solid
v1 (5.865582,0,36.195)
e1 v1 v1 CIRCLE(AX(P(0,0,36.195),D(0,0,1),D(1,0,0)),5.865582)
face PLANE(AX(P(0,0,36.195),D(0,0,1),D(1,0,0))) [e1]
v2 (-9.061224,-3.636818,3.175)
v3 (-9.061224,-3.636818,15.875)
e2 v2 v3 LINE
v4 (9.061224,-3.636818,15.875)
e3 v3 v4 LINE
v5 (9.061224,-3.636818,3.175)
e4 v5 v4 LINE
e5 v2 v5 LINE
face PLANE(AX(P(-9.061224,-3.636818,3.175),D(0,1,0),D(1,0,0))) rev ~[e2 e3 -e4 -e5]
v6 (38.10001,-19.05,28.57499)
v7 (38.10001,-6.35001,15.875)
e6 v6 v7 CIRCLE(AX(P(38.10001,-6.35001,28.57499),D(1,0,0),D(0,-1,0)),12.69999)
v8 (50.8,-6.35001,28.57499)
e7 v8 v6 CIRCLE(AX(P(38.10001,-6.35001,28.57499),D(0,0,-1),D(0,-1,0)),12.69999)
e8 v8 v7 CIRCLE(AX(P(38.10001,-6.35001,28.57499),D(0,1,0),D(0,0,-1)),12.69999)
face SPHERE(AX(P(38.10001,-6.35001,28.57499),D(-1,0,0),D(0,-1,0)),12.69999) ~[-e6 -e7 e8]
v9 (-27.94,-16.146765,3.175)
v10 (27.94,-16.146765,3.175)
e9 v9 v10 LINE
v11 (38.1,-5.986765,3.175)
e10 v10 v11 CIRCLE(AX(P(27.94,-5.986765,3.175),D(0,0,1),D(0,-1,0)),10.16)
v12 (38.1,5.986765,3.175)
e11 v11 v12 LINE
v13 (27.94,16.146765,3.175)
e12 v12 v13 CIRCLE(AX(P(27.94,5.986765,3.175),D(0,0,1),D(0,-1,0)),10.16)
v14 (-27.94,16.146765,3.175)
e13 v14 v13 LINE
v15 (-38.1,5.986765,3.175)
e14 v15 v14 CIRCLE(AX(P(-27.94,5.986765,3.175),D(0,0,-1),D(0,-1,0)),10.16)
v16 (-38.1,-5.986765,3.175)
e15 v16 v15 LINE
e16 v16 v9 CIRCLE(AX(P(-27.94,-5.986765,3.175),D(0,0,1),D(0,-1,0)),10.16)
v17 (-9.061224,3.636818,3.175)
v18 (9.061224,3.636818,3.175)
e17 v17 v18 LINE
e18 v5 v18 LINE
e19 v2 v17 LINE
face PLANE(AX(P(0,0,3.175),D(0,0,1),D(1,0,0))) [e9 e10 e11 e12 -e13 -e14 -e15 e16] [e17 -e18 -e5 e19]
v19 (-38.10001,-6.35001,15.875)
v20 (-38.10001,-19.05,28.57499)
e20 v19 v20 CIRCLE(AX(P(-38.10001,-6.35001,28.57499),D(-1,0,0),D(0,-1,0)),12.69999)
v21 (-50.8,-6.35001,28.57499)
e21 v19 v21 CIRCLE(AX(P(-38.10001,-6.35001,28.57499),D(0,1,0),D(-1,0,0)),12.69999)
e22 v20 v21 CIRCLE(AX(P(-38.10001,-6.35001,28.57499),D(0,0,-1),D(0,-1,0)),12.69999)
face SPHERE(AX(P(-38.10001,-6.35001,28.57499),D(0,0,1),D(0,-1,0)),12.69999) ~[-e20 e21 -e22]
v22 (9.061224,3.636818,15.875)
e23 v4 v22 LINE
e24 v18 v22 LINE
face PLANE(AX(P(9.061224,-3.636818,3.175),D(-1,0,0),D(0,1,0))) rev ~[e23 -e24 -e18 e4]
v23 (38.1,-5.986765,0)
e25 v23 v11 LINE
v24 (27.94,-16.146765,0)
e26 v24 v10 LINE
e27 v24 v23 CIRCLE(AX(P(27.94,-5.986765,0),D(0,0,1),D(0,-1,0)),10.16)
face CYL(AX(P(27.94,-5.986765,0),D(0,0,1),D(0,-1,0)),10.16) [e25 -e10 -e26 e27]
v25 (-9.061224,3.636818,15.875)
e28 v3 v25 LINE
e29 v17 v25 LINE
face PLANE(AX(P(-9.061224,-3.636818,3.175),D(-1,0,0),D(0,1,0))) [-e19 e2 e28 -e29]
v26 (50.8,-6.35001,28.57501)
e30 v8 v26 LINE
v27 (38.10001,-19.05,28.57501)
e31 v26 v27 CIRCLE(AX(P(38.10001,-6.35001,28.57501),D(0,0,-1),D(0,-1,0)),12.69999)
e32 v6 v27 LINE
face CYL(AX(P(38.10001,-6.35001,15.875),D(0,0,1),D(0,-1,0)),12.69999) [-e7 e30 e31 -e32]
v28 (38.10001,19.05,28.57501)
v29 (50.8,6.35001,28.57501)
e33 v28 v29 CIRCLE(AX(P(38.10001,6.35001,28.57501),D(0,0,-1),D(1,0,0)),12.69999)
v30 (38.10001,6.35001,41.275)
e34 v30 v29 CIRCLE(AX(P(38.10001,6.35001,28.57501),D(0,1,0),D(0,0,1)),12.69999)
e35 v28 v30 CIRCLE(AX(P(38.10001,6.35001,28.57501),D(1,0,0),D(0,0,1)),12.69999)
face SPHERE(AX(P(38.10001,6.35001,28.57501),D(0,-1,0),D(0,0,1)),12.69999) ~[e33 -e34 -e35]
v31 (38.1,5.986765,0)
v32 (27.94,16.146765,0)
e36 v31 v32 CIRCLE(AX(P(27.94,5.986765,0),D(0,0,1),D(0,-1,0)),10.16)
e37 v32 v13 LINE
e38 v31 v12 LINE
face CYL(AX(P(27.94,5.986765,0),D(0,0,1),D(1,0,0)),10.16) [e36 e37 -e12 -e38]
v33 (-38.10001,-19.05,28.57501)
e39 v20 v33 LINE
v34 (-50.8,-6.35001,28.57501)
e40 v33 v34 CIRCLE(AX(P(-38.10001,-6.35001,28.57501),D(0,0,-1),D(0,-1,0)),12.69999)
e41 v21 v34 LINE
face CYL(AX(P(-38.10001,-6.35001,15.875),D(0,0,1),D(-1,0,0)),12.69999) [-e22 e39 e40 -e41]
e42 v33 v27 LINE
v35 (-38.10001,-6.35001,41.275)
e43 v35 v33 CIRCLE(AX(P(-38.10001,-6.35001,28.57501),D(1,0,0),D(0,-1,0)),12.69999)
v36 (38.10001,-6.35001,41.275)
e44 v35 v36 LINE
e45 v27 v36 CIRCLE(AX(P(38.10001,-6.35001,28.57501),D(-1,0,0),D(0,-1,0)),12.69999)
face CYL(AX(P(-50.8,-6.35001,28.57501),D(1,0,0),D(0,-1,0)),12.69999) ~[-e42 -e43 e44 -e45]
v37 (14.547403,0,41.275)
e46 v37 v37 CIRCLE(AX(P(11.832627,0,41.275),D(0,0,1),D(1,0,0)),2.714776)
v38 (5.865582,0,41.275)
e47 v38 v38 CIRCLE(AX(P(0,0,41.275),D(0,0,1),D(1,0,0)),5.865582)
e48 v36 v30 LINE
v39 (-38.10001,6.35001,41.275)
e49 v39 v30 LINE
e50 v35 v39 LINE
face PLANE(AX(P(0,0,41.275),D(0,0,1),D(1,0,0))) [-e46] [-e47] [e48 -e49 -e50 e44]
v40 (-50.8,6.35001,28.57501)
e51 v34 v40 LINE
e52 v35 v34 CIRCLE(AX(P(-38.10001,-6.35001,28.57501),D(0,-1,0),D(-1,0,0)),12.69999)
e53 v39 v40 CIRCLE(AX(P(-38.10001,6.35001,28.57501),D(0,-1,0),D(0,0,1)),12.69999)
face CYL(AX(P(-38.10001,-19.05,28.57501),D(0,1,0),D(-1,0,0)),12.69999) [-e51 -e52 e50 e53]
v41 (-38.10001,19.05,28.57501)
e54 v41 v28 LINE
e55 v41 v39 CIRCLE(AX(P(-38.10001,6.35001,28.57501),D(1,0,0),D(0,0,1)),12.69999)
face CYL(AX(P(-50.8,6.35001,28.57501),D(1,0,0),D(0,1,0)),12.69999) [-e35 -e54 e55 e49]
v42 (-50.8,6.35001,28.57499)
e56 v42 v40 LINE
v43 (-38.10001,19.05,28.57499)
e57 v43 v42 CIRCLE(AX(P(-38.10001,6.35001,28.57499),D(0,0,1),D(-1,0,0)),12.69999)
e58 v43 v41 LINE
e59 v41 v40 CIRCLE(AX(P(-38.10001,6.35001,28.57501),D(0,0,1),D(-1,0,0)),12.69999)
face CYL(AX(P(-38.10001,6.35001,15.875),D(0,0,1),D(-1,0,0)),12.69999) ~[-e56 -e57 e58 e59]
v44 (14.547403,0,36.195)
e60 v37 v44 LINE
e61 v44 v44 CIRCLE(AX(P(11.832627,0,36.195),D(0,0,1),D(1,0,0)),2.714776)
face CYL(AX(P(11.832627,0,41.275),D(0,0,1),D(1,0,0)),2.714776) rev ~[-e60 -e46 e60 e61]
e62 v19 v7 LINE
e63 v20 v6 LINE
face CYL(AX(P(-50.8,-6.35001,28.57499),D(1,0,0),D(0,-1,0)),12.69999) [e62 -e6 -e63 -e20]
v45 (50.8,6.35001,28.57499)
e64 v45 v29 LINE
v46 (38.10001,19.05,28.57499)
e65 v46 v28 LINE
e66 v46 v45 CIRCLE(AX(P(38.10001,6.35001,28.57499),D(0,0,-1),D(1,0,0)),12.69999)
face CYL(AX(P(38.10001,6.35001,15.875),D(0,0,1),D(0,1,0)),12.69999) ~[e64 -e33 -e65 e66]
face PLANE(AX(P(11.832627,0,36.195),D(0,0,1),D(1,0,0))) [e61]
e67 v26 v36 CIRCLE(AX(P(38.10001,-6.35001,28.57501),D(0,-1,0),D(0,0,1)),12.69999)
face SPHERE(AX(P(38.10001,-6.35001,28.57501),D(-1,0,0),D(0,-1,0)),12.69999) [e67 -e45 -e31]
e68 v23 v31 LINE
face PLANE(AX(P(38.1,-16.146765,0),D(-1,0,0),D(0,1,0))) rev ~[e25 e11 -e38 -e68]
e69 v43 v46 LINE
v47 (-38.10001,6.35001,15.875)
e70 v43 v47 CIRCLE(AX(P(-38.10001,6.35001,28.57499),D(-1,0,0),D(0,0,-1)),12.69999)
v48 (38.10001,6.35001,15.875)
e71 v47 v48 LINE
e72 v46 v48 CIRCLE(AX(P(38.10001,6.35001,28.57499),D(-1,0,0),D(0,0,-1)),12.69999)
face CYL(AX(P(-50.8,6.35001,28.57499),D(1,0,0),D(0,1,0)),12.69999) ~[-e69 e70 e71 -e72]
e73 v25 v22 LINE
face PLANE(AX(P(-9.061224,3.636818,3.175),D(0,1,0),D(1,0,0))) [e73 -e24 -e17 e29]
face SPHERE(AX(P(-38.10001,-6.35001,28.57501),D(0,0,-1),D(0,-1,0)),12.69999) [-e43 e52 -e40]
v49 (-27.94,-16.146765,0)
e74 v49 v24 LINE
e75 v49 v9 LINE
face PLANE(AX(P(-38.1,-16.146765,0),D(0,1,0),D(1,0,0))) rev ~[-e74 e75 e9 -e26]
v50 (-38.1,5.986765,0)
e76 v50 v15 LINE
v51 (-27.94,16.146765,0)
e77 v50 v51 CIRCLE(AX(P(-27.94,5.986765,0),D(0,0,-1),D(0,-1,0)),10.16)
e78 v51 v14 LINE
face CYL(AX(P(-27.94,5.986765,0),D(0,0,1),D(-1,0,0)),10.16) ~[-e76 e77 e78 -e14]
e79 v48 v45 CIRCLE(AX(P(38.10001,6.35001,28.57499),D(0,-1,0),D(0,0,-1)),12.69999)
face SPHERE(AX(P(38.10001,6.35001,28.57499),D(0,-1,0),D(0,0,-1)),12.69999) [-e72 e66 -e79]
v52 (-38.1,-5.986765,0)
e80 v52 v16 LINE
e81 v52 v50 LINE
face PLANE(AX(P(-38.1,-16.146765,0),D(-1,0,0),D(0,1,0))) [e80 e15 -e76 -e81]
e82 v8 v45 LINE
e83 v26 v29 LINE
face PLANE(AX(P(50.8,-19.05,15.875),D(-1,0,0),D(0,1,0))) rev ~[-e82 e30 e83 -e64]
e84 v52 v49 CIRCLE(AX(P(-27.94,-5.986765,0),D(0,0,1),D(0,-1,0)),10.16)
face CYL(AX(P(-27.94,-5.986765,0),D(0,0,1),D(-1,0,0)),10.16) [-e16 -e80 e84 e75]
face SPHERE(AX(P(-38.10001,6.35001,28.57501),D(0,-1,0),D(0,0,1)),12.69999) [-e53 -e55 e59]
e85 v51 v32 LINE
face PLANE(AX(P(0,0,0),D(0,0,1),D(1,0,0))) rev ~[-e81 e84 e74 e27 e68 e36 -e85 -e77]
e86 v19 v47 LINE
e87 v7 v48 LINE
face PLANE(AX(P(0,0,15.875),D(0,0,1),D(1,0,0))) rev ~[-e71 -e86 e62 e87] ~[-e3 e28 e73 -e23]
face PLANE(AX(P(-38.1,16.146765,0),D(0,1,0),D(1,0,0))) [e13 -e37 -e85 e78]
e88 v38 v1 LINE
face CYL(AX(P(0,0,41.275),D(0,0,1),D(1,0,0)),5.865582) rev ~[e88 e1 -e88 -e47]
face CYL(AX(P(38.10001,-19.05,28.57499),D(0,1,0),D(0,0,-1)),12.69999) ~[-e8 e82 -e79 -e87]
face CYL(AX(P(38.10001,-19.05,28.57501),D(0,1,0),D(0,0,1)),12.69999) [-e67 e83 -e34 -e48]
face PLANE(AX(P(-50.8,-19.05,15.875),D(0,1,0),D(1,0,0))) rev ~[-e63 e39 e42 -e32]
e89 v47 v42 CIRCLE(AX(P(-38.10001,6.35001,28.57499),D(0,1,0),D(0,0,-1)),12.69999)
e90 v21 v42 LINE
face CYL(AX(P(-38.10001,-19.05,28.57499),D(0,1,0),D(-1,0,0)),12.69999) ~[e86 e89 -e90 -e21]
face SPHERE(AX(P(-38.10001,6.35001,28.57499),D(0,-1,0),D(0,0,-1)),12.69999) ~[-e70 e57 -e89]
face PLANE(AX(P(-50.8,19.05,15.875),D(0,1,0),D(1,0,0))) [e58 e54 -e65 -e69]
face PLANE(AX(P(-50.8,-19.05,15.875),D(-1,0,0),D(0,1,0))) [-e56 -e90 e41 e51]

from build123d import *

# Parameters (mm, degrees)
F0_W     = 76.2
F0_H     = 32.2935292425
F1_DEPTH = 3.175
F2_R     = 10.16
F3_W     = 18.1224476546
F3_H     = 7.2736367583
F4_DEPTH = 12.7
F5_W     = 101.6
F5_H     = 38.1
F5_W_2   = 18.1224476546
F5_H_2   = 7.2736367583
F6_DEPTH = 25.4
F7_R     = 12.69999
F8_R     = 5.8655823146
F8_R_2   = 2.7147756384
F9_DEPTH = 5.08


# Not quite as in the source:
# - a fillet or chamfer is up to 0.001 mm smaller than in the source, because OpenCascade refuses the exact size


with BuildPart() as f1:
    # F0 (on Top) → F1 (new body)
    with BuildSketch(Plane.XY):
        Rectangle(F0_W, F0_H)
    extrude(amount=F1_DEPTH)

    # F2
    f2_edges = [f1.edges().sort_by_distance(p)[0] for p in [
        (-38.1, -16.146765, 1.5875),
        (38.1, -16.146765, 1.5875),
        (38.1, 16.146765, 1.5875),
        (-38.1, 16.146765, 1.5875),
    ]]
    fillet(f2_edges, radius=F2_R)

    # F3 (on face) → F4 (join)
    with BuildSketch(Plane.XY.offset(3.175)):
        Rectangle(F3_W, F3_H)
    extrude(amount=F4_DEPTH)

    # F5 (on face) → F6 (join)
    with BuildSketch(Plane.XY.offset(15.875)):
        Rectangle(F5_W, F5_H)
        Rectangle(F5_W_2, F5_H_2, mode=Mode.SUBTRACT)
        Rectangle(F5_W_2, F5_H_2)
    extrude(amount=F6_DEPTH)

    # F7 (radius 12.7 in the source; OpenCascade refuses exactly that, so slightly less here)
    f7_edges = [f1.edges().sort_by_distance(p)[0] for p in [
        (-50.8, -19.05, 28.575),
        (0, -19.05, 41.275),
        (0, -19.05, 15.875),
        (50.8, -19.05, 28.575),
        (50.8, 0, 41.275),
        (50.8, 0, 15.875),
        (-50.8, 0, 41.275),
        (-50.8, 0, 15.875),
        (0, 19.05, 15.875),
        (0, 19.05, 41.275),
        (50.8, 19.05, 28.575),
        (-50.8, 19.05, 28.575),
    ]]
    fillet(f7_edges, radius=F7_R)

    # F8 (on face) → F9 (cut)
    with BuildSketch(Plane.XY.offset(41.275)):
        Circle(F8_R)
        with Locations((11.8326274678, 0)):
            Circle(F8_R_2)
    extrude(amount=-F9_DEPTH, mode=Mode.SUBTRACT)


solid = f1.part
